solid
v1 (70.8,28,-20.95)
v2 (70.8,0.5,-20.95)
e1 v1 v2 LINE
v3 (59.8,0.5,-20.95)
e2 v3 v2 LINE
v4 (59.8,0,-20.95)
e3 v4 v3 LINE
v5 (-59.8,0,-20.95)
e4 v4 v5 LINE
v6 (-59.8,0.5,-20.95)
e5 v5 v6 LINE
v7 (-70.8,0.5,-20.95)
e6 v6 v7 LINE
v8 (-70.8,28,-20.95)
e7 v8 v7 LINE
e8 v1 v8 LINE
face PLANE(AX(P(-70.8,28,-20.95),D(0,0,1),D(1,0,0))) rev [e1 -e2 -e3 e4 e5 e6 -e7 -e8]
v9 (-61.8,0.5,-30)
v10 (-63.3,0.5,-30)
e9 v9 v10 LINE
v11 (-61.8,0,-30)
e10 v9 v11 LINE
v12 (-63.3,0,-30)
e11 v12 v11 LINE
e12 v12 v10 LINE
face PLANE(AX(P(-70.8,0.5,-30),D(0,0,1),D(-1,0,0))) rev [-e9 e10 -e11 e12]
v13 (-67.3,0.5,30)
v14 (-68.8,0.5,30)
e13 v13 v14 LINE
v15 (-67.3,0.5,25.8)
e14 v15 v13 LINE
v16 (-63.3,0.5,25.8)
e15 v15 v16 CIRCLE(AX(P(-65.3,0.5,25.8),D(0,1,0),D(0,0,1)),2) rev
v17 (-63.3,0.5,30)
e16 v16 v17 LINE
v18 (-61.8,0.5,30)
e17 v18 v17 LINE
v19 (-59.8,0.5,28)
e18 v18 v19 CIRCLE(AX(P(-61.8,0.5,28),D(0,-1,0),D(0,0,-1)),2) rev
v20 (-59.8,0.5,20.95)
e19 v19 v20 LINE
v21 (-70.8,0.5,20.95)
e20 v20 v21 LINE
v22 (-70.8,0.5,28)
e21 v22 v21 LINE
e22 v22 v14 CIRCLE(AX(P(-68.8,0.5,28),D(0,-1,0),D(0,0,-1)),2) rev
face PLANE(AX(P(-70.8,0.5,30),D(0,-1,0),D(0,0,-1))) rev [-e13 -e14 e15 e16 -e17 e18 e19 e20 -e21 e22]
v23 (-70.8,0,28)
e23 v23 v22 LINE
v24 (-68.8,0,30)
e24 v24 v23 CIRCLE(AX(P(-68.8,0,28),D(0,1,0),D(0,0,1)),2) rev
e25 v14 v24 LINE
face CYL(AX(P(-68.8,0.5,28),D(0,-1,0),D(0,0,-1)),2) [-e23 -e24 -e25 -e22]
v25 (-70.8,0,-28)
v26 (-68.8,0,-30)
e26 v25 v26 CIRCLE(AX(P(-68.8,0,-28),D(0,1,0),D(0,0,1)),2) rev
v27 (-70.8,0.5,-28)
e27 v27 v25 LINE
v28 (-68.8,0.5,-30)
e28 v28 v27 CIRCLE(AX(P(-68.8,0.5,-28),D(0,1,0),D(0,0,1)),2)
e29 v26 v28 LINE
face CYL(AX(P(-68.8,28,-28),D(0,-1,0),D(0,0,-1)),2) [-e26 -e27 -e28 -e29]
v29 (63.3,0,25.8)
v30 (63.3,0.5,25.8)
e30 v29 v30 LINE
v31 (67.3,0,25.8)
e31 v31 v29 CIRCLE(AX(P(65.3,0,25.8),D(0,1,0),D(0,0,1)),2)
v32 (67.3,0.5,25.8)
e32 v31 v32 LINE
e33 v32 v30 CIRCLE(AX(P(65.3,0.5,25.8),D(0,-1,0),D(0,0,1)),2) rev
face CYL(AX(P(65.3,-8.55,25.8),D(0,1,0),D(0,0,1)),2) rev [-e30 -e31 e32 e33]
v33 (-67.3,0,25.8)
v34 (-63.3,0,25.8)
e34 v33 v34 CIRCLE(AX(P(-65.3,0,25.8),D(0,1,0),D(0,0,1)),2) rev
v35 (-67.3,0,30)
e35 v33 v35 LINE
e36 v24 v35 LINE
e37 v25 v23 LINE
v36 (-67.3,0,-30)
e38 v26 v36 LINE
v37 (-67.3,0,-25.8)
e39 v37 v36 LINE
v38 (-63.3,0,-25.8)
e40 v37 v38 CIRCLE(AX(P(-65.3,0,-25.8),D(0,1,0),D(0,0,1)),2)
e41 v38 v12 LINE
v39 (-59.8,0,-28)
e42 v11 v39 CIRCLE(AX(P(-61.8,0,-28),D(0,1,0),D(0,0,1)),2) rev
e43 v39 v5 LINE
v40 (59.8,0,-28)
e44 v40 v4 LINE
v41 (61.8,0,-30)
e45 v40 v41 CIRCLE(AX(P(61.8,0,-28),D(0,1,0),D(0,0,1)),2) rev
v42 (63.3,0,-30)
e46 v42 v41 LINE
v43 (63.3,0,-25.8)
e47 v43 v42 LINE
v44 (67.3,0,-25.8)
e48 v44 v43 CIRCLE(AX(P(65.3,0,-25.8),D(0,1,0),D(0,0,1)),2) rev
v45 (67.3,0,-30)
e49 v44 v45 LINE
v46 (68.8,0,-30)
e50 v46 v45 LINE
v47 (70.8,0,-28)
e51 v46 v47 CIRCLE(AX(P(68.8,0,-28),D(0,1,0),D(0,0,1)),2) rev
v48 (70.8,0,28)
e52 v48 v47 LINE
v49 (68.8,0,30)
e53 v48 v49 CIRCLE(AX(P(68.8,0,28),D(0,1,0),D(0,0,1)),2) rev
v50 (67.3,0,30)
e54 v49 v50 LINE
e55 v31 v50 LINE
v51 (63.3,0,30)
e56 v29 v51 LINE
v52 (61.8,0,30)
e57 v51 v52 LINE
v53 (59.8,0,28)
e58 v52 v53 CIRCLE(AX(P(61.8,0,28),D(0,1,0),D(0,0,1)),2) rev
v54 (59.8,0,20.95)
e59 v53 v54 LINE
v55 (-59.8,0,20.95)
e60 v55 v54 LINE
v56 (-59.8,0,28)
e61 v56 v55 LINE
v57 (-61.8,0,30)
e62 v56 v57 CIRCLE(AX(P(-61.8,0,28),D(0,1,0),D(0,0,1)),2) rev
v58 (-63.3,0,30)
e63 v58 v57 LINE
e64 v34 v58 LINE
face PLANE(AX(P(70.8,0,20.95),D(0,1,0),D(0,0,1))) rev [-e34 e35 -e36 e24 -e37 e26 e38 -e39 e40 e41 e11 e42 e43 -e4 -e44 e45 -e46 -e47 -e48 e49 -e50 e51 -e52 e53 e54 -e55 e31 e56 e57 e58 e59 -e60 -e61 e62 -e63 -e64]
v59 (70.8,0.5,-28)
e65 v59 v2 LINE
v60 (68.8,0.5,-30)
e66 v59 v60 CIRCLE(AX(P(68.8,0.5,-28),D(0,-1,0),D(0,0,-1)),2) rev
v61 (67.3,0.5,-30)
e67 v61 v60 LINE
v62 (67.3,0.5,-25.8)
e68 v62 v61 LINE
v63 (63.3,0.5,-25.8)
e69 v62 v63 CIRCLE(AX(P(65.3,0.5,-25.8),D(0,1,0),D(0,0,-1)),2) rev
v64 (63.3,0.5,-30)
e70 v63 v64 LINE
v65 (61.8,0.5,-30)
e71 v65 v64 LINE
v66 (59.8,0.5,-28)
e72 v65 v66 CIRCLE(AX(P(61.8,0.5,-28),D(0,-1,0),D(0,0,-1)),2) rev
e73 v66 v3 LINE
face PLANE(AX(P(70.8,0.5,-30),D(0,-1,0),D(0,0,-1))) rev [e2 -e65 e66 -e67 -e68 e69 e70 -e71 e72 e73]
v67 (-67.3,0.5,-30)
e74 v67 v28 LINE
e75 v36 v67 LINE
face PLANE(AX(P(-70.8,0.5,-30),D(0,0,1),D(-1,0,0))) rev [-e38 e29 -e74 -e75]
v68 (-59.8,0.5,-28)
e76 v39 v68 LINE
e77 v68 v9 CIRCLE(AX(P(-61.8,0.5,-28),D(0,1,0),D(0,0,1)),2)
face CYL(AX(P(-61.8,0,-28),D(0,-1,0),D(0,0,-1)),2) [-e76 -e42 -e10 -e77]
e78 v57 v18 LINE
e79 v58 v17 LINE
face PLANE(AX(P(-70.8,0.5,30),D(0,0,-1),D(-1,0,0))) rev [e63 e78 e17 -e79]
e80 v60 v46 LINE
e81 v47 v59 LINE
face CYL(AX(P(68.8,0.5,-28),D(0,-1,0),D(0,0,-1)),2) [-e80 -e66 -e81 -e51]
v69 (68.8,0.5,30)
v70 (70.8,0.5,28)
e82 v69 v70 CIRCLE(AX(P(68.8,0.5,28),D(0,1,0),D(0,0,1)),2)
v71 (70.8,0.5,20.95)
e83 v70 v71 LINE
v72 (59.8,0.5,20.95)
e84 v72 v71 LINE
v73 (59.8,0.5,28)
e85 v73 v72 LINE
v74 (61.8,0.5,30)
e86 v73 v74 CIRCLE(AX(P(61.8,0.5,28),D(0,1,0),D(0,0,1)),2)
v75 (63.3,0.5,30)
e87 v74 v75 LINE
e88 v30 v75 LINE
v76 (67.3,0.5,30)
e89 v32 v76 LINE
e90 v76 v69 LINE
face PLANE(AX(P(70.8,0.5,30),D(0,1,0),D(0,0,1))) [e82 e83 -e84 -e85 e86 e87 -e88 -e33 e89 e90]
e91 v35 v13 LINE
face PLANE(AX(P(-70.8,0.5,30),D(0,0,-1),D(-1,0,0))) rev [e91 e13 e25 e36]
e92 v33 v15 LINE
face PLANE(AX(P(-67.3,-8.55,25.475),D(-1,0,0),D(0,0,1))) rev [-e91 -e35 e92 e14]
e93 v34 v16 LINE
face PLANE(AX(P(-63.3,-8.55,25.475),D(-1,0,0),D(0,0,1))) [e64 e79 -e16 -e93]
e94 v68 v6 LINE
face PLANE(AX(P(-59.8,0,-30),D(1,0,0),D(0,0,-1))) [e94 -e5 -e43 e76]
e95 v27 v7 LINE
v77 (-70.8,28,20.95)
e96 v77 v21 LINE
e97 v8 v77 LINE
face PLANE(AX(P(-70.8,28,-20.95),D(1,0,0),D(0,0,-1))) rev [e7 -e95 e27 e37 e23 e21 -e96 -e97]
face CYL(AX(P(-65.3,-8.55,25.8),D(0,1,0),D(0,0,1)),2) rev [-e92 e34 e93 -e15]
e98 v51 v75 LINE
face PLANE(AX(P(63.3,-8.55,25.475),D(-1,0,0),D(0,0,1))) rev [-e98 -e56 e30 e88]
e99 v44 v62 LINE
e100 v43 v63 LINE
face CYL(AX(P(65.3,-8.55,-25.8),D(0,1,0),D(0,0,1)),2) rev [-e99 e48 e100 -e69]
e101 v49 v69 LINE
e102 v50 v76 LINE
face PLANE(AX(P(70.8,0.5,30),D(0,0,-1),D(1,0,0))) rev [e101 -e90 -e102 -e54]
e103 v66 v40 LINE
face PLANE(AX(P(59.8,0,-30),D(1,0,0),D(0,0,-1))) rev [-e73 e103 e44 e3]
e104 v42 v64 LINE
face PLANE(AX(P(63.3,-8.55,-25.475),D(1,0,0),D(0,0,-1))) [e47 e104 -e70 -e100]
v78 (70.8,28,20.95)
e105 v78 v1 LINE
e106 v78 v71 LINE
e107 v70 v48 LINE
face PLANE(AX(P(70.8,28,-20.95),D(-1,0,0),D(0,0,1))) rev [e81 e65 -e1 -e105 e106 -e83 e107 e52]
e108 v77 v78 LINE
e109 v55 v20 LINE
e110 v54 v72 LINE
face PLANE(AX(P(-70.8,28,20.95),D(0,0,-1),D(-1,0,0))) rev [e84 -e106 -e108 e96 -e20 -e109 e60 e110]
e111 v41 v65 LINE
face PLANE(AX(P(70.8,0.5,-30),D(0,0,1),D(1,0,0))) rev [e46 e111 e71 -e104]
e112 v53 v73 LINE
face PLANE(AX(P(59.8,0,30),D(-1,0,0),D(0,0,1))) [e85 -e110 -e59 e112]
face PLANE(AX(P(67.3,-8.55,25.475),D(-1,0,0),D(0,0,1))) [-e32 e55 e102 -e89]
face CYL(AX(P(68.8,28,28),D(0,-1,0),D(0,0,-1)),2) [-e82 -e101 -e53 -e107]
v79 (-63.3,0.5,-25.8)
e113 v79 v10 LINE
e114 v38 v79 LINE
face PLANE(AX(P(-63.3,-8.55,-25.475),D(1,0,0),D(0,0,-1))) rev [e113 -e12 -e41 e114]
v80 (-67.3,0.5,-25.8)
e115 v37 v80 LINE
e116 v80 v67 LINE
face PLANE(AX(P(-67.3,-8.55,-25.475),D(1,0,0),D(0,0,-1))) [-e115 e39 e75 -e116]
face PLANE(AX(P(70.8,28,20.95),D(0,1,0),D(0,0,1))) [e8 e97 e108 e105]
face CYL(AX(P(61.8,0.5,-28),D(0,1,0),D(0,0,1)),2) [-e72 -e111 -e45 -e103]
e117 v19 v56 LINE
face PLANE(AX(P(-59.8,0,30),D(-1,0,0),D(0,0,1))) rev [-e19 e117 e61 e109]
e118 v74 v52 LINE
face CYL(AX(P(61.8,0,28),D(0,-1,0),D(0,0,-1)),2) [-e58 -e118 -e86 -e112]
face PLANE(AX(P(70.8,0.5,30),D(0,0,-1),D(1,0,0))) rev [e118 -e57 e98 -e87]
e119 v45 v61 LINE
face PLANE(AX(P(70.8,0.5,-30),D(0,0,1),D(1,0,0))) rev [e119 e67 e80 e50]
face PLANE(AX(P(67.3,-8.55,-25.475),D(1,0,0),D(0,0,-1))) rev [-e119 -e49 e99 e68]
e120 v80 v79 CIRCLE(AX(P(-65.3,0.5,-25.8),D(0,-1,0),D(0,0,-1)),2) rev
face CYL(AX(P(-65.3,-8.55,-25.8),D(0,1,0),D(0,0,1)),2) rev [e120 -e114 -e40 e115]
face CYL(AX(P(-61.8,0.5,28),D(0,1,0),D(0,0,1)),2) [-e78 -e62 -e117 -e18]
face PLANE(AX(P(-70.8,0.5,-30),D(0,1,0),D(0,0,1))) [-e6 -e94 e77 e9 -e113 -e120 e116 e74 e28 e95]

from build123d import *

# Parameters (mm, degrees)
SKETCH1_W            = 141.6
SKETCH1_H            = 41.9
BOSS_EXTRUDE1_DEPTH  = 28
SKETCH2_W            = 11
SKETCH2_H            = 0.5
BOSS_EXTRUDE2_DEPTH  = 9.05
FILLET1_R            = 2
SKETCH3_W            = 4
SKETCH3_H            = 4.2
CUT_EXTRUDE1_DEPTH   = 9.05
FILLET1_OF_MIRROR1_R = 2
MIRROR2_DEPTH        = 0.5


# Read off the part's stored shape, not the designer's step: Mirror2
with BuildPart() as part:
    # Sketch1 → Boss-Extrude1 (new body)
    with BuildSketch(Plane(origin=(0, 0, 0), x_dir=(1, 0, 0), z_dir=(0, 1, 0))):
        Rectangle(SKETCH1_W, SKETCH1_H)
    extrude(amount=BOSS_EXTRUDE1_DEPTH)

    # Sketch2 → Boss-Extrude2 (add)
    with BuildSketch(Plane.XY.offset(20.95)):
        with Locations((-65.3, 0.25)):
            Rectangle(SKETCH2_W, SKETCH2_H)
    boss_extrude2 = extrude(amount=BOSS_EXTRUDE2_DEPTH)

    # Fillet1
    fillet1_edges = [part.edges().sort_by_distance(p)[0] for p in [
        (-59.8, 0.25, 30),
        (-70.8, 0.25, 30),
    ]]
    fillet(fillet1_edges, radius=FILLET1_R)

    # Sketch3 → Cut-Extrude1 (cut)
    with BuildSketch(Plane(origin=(0, 0.5, 0), x_dir=(1, 0, 0), z_dir=(0, 1, 0))):
        with BuildLine():
            ThreePointArc((-67.3, -25.8), (-65.3, -23.8), (-63.3, -25.8))
            Line((-63.3, -25.8), (-67.3, -25.8))
        make_face()
        with Locations((-65.3, -27.9)):
            Rectangle(SKETCH3_W, SKETCH3_H)
    cut_extrude1 = extrude(amount=-CUT_EXTRUDE1_DEPTH, mode=Mode.SUBTRACT)

    # Mirror1: Boss-Extrude2, Cut-Extrude1 across plane
    add(boss_extrude2.mirror(Plane(origin=(0, 0, 0), x_dir=(0, 0, 1), z_dir=(1, 0, 0))))
    add(cut_extrude1.mirror(Plane(origin=(0, 0, 0), x_dir=(0, 0, 1), z_dir=(1, 0, 0))), mode=Mode.SUBTRACT)

    # Fillet1 of Mirror1
    fillet1_of_mirror1_edges = [part.edges().sort_by_distance(p)[0] for p in [
        (59.8, 0.25, 30),
        (70.8, 0.25, 30),
    ]]
    fillet(fillet1_of_mirror1_edges, radius=FILLET1_OF_MIRROR1_R)

    # Mirror2 outline → Mirror2 (add)
    with BuildSketch(Plane(origin=(0, 0, 0), x_dir=(1, 0, 0), z_dir=(0, 1, 0))):
        with BuildLine():
            Line((59.8, 28), (59.8, 20.95))
            Line((59.8, 20.95), (70.8, 20.95))
            Line((70.8, 20.95), (70.8, 28))
            ThreePointArc((70.8, 28), (70.214213562, 29.414213562), (68.8, 30))
            Line((68.8, 30), (67.3, 30))
            Line((67.3, 30), (67.3, 25.8))
            ThreePointArc((67.3, 25.8), (65.3, 23.8), (63.3, 25.8))
            Line((63.3, 25.8), (63.3, 30))
            Line((63.3, 30), (61.8, 30))
            ThreePointArc((61.8, 30), (60.385786438, 29.414213562), (59.8, 28))
        make_face()
        with BuildLine():
            Line((-67.3, 30), (-68.8, 30))
            ThreePointArc((-68.8, 30), (-70.214213562, 29.414213562), (-70.8, 28))
            Line((-70.8, 28), (-70.8, 20.95))
            Line((-70.8, 20.95), (-59.8, 20.95))
            Line((-59.8, 20.95), (-59.8, 28))
            ThreePointArc((-59.8, 28), (-60.385786438, 29.414213562), (-61.8, 30))
            Line((-61.8, 30), (-63.3, 30))
            Line((-63.3, 30), (-63.3, 25.8))
            ThreePointArc((-63.3, 25.8), (-65.3, 23.8), (-67.3, 25.8))
            Line((-67.3, 25.8), (-67.3, 30))
        make_face()
    extrude(amount=MIRROR2_DEPTH)


solid = part.part
